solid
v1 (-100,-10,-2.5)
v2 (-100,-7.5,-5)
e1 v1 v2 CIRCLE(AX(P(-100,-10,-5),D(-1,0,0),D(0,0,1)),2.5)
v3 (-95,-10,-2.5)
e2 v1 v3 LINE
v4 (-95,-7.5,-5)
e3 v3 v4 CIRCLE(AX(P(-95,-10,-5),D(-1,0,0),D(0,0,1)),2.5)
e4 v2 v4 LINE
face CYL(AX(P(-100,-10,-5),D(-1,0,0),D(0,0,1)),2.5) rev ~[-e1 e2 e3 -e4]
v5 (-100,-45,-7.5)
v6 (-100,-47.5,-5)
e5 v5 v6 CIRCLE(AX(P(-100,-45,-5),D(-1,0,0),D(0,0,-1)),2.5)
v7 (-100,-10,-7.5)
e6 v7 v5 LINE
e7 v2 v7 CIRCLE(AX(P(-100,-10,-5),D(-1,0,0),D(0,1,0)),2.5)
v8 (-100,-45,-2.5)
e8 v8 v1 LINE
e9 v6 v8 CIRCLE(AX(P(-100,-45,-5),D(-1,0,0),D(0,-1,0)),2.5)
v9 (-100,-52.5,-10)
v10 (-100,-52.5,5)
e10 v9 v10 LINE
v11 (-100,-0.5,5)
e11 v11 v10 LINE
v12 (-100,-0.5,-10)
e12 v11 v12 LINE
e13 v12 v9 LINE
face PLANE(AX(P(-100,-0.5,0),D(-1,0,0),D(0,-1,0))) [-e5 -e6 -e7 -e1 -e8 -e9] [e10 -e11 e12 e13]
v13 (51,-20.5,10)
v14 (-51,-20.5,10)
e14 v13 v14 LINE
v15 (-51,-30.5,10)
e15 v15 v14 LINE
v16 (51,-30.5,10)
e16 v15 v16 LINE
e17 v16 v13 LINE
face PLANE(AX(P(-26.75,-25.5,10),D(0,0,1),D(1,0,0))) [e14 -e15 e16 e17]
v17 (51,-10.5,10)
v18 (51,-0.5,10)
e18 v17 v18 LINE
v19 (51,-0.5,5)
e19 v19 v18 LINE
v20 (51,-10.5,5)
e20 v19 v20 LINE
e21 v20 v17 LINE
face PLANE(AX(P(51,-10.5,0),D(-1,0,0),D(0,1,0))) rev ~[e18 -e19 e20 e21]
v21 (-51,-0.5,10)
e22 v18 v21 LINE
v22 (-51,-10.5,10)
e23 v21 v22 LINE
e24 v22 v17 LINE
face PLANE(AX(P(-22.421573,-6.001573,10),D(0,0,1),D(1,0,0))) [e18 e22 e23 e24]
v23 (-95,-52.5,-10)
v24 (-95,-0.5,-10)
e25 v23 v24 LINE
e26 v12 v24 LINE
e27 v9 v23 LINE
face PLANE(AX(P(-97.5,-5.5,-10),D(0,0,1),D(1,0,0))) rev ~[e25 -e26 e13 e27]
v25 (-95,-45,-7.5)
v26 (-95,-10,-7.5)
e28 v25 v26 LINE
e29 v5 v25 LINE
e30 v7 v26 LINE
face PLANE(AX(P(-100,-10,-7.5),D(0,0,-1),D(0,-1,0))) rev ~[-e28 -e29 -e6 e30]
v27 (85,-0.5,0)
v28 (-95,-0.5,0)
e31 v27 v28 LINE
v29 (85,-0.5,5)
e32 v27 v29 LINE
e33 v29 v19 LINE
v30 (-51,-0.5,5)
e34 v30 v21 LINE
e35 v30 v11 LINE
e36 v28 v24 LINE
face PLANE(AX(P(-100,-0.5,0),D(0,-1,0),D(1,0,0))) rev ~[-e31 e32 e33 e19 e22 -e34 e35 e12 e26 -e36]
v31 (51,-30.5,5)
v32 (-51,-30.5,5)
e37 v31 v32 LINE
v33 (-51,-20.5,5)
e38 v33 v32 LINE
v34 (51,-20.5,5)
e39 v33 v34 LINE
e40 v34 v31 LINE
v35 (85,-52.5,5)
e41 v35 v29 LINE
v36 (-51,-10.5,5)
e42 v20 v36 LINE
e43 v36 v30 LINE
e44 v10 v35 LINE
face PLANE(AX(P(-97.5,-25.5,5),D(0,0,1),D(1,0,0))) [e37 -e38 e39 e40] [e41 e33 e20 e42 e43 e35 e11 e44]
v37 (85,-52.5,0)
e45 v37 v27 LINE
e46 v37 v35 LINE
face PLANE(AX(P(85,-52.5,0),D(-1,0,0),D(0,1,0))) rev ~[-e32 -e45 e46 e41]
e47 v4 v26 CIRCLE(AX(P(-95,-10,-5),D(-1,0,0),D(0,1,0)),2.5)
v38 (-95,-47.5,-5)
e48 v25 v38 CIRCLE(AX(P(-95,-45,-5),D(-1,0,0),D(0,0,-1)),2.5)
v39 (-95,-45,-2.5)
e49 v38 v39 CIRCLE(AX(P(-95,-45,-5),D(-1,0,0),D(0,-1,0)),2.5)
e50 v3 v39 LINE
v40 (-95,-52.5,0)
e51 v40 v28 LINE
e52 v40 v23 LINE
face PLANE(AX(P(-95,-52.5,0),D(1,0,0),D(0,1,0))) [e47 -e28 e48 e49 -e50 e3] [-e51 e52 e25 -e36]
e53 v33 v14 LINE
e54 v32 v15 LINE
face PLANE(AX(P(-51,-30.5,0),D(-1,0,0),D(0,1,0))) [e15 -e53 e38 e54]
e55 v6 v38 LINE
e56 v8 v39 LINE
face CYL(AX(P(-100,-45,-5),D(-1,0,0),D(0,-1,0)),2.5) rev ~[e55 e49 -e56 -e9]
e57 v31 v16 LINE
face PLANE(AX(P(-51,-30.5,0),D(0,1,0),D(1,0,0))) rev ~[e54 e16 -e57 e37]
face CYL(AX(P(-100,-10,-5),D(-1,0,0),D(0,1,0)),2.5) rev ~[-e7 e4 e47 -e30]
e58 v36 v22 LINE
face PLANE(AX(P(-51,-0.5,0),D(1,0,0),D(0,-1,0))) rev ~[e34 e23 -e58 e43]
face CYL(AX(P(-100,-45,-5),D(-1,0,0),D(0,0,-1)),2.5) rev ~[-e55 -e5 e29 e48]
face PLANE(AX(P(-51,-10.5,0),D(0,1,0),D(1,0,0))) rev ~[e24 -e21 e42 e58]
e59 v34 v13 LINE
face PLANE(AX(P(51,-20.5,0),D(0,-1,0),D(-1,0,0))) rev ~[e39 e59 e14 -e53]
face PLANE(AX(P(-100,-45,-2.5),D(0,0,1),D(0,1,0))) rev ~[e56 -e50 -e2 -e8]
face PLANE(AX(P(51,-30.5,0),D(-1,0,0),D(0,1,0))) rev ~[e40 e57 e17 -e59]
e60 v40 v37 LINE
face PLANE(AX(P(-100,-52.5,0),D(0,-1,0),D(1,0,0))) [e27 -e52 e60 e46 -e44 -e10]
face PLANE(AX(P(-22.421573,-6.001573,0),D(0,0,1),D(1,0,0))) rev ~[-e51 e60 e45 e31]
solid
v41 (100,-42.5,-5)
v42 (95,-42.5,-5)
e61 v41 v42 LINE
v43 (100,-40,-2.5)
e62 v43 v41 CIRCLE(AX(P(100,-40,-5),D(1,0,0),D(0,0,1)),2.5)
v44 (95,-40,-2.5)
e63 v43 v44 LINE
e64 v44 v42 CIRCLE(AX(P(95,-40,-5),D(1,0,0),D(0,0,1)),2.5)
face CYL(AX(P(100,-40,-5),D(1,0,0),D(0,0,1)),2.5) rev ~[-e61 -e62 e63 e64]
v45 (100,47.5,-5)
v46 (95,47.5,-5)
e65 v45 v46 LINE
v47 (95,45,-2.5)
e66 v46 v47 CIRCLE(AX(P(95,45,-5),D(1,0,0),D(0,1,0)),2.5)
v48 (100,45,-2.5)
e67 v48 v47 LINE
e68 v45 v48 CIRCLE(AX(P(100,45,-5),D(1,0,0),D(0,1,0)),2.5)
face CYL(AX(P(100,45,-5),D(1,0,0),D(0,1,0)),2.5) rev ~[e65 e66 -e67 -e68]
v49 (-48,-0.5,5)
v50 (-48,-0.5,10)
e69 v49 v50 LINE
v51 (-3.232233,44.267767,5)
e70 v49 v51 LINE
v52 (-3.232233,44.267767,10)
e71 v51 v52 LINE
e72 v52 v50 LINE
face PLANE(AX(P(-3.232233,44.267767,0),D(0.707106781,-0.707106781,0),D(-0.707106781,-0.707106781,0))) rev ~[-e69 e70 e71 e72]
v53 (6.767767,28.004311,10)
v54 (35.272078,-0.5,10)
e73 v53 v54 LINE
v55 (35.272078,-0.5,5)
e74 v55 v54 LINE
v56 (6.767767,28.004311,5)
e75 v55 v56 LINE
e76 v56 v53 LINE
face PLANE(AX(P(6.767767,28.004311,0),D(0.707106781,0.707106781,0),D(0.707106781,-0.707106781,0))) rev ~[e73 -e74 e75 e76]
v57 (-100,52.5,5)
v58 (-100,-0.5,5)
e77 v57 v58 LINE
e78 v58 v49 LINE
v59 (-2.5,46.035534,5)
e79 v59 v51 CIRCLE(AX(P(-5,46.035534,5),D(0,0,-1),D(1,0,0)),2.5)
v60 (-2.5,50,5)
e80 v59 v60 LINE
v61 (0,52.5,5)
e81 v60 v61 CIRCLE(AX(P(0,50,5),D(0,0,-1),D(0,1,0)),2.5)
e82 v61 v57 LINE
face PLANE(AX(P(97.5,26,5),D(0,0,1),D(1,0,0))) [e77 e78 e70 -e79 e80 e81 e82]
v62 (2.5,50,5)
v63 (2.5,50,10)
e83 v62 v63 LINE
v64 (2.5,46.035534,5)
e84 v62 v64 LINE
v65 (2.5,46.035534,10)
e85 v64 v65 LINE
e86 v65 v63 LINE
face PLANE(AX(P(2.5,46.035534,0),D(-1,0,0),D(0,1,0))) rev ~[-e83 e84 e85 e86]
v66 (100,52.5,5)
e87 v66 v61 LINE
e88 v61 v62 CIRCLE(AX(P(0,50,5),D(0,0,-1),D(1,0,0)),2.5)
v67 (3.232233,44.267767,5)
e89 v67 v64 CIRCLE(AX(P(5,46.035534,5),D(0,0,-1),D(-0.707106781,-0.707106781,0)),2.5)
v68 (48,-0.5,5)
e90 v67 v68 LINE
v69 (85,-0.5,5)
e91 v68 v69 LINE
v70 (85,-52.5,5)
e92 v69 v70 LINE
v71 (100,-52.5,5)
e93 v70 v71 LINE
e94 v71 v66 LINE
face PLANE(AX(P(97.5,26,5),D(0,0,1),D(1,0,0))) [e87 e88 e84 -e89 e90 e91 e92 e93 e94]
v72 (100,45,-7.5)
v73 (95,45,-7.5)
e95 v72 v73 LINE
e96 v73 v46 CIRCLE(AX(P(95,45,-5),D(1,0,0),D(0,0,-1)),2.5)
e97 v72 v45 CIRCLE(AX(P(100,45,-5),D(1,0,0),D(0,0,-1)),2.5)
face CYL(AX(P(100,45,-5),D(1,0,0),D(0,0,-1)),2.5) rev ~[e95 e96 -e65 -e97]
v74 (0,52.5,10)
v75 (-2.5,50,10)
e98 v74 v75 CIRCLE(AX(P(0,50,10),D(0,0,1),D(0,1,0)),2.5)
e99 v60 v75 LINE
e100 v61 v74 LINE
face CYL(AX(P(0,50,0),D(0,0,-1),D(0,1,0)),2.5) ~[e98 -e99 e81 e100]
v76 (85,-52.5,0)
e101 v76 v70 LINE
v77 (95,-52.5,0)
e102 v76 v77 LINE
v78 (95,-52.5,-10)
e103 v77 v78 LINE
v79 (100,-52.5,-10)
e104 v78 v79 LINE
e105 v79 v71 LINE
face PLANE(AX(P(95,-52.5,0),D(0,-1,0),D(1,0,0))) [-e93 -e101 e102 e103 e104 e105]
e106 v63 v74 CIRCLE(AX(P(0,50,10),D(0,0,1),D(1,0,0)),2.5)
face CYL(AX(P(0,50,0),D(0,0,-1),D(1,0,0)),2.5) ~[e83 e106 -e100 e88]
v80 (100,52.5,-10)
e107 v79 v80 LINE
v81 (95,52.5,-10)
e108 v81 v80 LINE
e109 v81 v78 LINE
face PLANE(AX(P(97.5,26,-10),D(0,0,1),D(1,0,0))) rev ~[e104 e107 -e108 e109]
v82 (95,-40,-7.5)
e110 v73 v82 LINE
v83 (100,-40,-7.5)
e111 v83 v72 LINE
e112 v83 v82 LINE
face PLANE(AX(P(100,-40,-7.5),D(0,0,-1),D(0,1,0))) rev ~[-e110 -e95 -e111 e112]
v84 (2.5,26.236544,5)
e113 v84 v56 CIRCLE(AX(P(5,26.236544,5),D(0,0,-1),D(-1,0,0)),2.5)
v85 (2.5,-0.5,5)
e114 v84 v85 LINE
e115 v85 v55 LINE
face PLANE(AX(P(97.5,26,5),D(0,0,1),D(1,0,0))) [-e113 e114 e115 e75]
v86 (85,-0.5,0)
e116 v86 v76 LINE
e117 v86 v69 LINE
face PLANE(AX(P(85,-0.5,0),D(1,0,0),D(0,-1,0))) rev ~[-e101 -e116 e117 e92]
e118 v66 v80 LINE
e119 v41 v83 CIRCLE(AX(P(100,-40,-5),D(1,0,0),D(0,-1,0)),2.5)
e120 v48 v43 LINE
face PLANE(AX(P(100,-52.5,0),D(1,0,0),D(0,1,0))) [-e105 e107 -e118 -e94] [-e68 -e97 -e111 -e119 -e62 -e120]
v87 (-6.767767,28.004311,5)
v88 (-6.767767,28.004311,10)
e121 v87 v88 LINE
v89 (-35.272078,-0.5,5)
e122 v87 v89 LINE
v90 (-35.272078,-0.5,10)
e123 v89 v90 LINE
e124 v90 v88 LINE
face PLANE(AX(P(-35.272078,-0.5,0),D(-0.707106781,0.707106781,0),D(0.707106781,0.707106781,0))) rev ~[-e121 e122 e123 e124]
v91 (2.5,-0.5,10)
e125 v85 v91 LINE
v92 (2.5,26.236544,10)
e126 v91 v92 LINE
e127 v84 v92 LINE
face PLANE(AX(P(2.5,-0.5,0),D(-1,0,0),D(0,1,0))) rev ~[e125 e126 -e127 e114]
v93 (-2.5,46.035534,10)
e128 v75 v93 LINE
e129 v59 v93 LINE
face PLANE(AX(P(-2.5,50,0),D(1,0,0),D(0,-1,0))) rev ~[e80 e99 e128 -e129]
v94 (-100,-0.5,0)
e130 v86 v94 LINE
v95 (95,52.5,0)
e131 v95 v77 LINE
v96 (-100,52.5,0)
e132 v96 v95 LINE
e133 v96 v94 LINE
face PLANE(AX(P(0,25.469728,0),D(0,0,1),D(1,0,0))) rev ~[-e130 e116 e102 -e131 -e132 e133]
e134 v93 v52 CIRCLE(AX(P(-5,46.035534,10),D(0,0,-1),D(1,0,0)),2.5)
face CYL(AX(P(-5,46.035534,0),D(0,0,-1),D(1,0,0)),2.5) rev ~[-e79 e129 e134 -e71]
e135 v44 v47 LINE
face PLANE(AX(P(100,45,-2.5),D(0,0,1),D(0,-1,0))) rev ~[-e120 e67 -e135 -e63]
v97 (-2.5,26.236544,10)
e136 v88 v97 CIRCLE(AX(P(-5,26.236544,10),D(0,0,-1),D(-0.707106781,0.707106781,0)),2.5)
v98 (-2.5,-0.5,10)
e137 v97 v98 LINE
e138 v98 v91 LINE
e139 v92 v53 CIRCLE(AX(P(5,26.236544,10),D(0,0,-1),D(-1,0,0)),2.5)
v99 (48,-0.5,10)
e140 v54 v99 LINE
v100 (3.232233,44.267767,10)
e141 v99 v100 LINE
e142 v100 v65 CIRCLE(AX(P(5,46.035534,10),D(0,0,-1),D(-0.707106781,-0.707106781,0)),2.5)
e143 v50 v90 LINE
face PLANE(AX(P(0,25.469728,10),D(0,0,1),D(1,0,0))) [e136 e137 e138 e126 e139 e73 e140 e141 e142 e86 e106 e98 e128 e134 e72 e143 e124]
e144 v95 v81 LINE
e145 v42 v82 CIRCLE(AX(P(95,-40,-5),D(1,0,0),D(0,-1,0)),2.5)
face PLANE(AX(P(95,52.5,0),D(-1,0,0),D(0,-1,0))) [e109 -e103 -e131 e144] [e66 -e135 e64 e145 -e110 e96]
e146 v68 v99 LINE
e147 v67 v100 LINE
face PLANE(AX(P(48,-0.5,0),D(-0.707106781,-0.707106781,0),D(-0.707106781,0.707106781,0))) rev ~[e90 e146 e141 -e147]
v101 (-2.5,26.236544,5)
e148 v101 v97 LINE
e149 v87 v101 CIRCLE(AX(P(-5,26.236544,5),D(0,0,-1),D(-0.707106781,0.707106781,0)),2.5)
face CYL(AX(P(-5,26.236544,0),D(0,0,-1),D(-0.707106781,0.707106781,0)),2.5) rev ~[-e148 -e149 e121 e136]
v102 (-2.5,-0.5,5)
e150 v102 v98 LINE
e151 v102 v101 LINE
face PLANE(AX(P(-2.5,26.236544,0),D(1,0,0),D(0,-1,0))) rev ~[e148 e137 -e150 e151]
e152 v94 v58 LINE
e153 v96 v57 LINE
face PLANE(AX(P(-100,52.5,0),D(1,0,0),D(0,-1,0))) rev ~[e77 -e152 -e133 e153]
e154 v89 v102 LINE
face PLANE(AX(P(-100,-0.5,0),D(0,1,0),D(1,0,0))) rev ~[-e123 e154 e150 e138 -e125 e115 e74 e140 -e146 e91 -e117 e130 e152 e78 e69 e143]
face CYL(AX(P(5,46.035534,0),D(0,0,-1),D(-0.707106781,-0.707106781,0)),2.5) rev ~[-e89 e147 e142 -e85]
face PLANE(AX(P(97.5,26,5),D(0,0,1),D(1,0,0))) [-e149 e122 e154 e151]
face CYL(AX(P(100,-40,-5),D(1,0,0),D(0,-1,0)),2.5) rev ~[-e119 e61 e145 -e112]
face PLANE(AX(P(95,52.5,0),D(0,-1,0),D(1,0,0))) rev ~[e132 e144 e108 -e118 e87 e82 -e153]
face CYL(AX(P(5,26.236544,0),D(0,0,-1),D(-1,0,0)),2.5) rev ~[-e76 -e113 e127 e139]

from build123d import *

# Parameters (mm, degrees)
F0_W      = 5
F0_H      = 53
F0_W_2    = 10
F0_H_2    = 10
F1_DEPTH  = 5
F2_DEPTH  = 10
F3_DEPTH  = 10
F0_W_3    = 48.5
F4_DEPTH  = 5
F5_DEPTH  = 10
F6_DEPTH  = 10
F8_DEPTH  = 25
F10_DEPTH = 25


with BuildPart() as f1:
    # F0 (on Top) → F1 (new body)
    with BuildSketch(Plane.XY):
        with Locations((97.5, 26)):
            Rectangle(F0_W, F0_H)
        with BuildLine():
            Line((0, 52.5), (-100, 52.5))
            Line((-100, 52.5), (-100, -0.5))
            Line((-100, -0.5), (-95, -0.5))
            Line((-95, -0.5), (-51, -0.5))
            Line((-51, -0.5), (-48, -0.5))
            Line((-48, -0.5), (-3.232233047, 44.267766953))
            ThreePointArc((-3.232233047, 44.267766953), (-2.6903011687, 45.078825325), (-2.5, 46.0355339059))
            Line((-2.5, 46.0355339059), (-2.5, 50))
            ThreePointArc((-2.5, 50), (-1.767766953, 51.767766953), (0, 52.5))
        make_face()
        with BuildLine():
            Line((85, 52.5), (0, 52.5))
            ThreePointArc((0, 52.5), (1.767766953, 51.767766953), (2.5, 50))
            Line((2.5, 50), (2.5, 46.0355339059))
            ThreePointArc((2.5, 46.0355339059), (2.6903011687, 45.078825325), (3.232233047, 44.267766953))
            Line((3.232233047, 44.267766953), (48, -0.5))
            Line((48, -0.5), (51, -0.5))
            Line((51, -0.5), (85, -0.5))
            Line((85, -0.5), (85, 52.5))
        make_face()
        with BuildLine():
            ThreePointArc((2.5, 50), (1.767766953, 51.767766953), (0, 52.5))
            ThreePointArc((0, 52.5), (-1.767766953, 51.767766953), (-2.5, 50))
            Line((-2.5, 50), (-2.5, 46.0355339059))
            Line((-2.5, 46.0355339059), (-2.5, 32.2720779386))
            Line((-2.5, 32.2720779386), (-2.5, 26.2365440327))
            Line((-2.5, 26.2365440327), (-2.5, 0))
            Line((-2.5, 0), (-2.5, -0.5))
            Line((-2.5, -0.5), (2.5, -0.5))
            Line((2.5, -0.5), (2.5, 26.2365440327))
            Line((2.5, 26.2365440327), (2.5, 46.0355339059))
            Line((2.5, 46.0355339059), (2.5, 50))
        make_face()
        with BuildLine():
            Line((-2.5, 32.2720779386), (-2.5, 46.0355339059))
            ThreePointArc((-2.5, 46.0355339059), (-2.6903011687, 45.078825325), (-3.232233047, 44.267766953))
            Line((-3.232233047, 44.267766953), (-48, -0.5))
            Line((-48, -0.5), (-35.2720779386, -0.5))
            Line((-35.2720779386, -0.5), (-6.767766953, 28.0043109857))
            ThreePointArc((-6.767766953, 28.0043109857), (-4.0432914191, 28.546242864), (-2.5, 26.2365440327))
            Line((-2.5, 26.2365440327), (-2.5, 32.2720779386))
        make_face()
        with BuildLine():
            Line((-2.5, 0), (-2.5, 26.2365440327))
            ThreePointArc((-2.5, 26.2365440327), (-4.0432914191, 28.546242864), (-6.767766953, 28.0043109857))
            Line((-6.767766953, 28.0043109857), (-35.2720779386, -0.5))
            Line((-35.2720779386, -0.5), (-2.5, -0.5))
            Line((-2.5, -0.5), (-2.5, 0))
        make_face()
        with BuildLine():
            ThreePointArc((6.767766953, 28.0043109857), (4.0432914191, 28.546242864), (2.5, 26.2365440327))
            Line((2.5, 26.2365440327), (2.5, -0.5))
            Line((2.5, -0.5), (35.2720779386, -0.5))
            Line((35.2720779386, -0.5), (6.767766953, 28.0043109857))
        make_face()
        with BuildLine():
            ThreePointArc((3.232233047, 44.267766953), (2.6903011687, 45.078825325), (2.5, 46.0355339059))
            Line((2.5, 46.0355339059), (2.5, 26.2365440327))
            ThreePointArc((2.5, 26.2365440327), (4.0432914191, 28.546242864), (6.767766953, 28.0043109857))
            Line((6.767766953, 28.0043109857), (35.2720779386, -0.5))
            Line((35.2720779386, -0.5), (48, -0.5))
            Line((48, -0.5), (3.232233047, 44.267766953))
        make_face()
        with Locations((90, 26)):
            Rectangle(F0_W_2, F0_H)
        with Locations((90, -5.5)):
            Rectangle(F0_W_2, F0_H_2)
        with Locations((90, -15.5)):
            Rectangle(F0_W_2, F0_H_2)
        with Locations((90, -25.5)):
            Rectangle(F0_W_2, F0_H_2)
        with Locations((97.5, -25.5)):
            Rectangle(F0_W, F0_H_2)
        with Locations((97.5, -15.5)):
            Rectangle(F0_W, F0_H_2)
        with Locations((97.5, -5.5)):
            Rectangle(F0_W, F0_H_2)
        Polygon((95, -30.5), (85, -30.5), (85, -37.5), (95, -47.5), align=None)
        with BuildLine():
            Line((100, -30.5), (95, -30.5))
            Line((95, -30.5), (95, -47.5))
            Line((95, -47.5), (95.732233047, -48.232233047))
            ThreePointArc((95.732233047, -48.232233047), (96.4244505146, -50.4455071839), (95, -52.2754493028))
            Line((95, -52.2754493028), (95, -52.5))
            Line((95, -52.5), (100, -52.5))
            Line((100, -52.5), (100, -30.5))
        make_face()
        with BuildLine():
            Line((95, -47.5), (85, -37.5))
            Line((85, -37.5), (85, -50.2279220614))
            Line((85, -50.2279220614), (86.5398448916, -51.767766953))
            ThreePointArc((86.5398448916, -51.767766953), (87.3509032637, -52.3096988313), (88.3076118446, -52.5))
            Line((88.3076118446, -52.5), (93.9644660941, -52.5))
            ThreePointArc((93.9644660941, -52.5), (94.4942664069, -52.4432174747), (95, -52.2754493028))
            Line((95, -52.2754493028), (95, -47.5))
        make_face()
        with BuildLine():
            Line((86.5398448916, -51.767766953), (85, -50.2279220614))
            Line((85, -50.2279220614), (85, -52.5))
            Line((85, -52.5), (88.3076118446, -52.5))
            ThreePointArc((88.3076118446, -52.5), (87.3509032637, -52.3096988313), (86.5398448916, -51.767766953))
        make_face()
        with BuildLine():
            Line((95.732233047, -48.232233047), (95, -47.5))
            Line((95, -47.5), (95, -52.2754493028))
            ThreePointArc((95, -52.2754493028), (96.4244505146, -50.4455071839), (95.732233047, -48.232233047))
        make_face()
        with BuildLine():
            Line((95, -52.5), (95, -52.2754493028))
            ThreePointArc((95, -52.2754493028), (94.4942664069, -52.4432174747), (93.9644660941, -52.5))
            Line((93.9644660941, -52.5), (95, -52.5))
        make_face()
    extrude(amount=F1_DEPTH)

    # F0 (on Top) → F2 (join)
    with BuildSketch(Plane.XY):
        with BuildLine():
            ThreePointArc((2.5, 50), (1.767766953, 51.767766953), (0, 52.5))
            ThreePointArc((0, 52.5), (-1.767766953, 51.767766953), (-2.5, 50))
            Line((-2.5, 50), (-2.5, 46.0355339059))
            Line((-2.5, 46.0355339059), (-2.5, 32.2720779386))
            Line((-2.5, 32.2720779386), (-2.5, 26.2365440327))
            Line((-2.5, 26.2365440327), (-2.5, 0))
            Line((-2.5, 0), (-2.5, -0.5))
            Line((-2.5, -0.5), (2.5, -0.5))
            Line((2.5, -0.5), (2.5, 26.2365440327))
            Line((2.5, 26.2365440327), (2.5, 46.0355339059))
            Line((2.5, 46.0355339059), (2.5, 50))
        make_face()
        with BuildLine():
            Line((-2.5, 32.2720779386), (-2.5, 46.0355339059))
            ThreePointArc((-2.5, 46.0355339059), (-2.6903011687, 45.078825325), (-3.232233047, 44.267766953))
            Line((-3.232233047, 44.267766953), (-48, -0.5))
            Line((-48, -0.5), (-35.2720779386, -0.5))
            Line((-35.2720779386, -0.5), (-6.767766953, 28.0043109857))
            ThreePointArc((-6.767766953, 28.0043109857), (-4.0432914191, 28.546242864), (-2.5, 26.2365440327))
            Line((-2.5, 26.2365440327), (-2.5, 32.2720779386))
        make_face()
        with BuildLine():
            ThreePointArc((3.232233047, 44.267766953), (2.6903011687, 45.078825325), (2.5, 46.0355339059))
            Line((2.5, 46.0355339059), (2.5, 26.2365440327))
            ThreePointArc((2.5, 26.2365440327), (4.0432914191, 28.546242864), (6.767766953, 28.0043109857))
            Line((6.767766953, 28.0043109857), (35.2720779386, -0.5))
            Line((35.2720779386, -0.5), (48, -0.5))
            Line((48, -0.5), (3.232233047, 44.267766953))
        make_face()
    extrude(amount=F2_DEPTH)

    # F0 (on Top) → F3 (join)
    with BuildSketch(Plane.XY):
        with Locations((97.5, 26)):
            Rectangle(F0_W, F0_H)
        with Locations((97.5, -5.5)):
            Rectangle(F0_W, F0_H_2)
        with Locations((97.5, -15.5)):
            Rectangle(F0_W, F0_H_2)
        with Locations((97.5, -25.5)):
            Rectangle(F0_W, F0_H_2)
        with BuildLine():
            Line((100, -30.5), (95, -30.5))
            Line((95, -30.5), (95, -47.5))
            Line((95, -47.5), (95.732233047, -48.232233047))
            ThreePointArc((95.732233047, -48.232233047), (96.4244505146, -50.4455071839), (95, -52.2754493028))
            Line((95, -52.2754493028), (95, -52.5))
            Line((95, -52.5), (100, -52.5))
            Line((100, -52.5), (100, -30.5))
        make_face()
        with BuildLine():
            Line((95.732233047, -48.232233047), (95, -47.5))
            Line((95, -47.5), (95, -52.2754493028))
            ThreePointArc((95, -52.2754493028), (96.4244505146, -50.4455071839), (95.732233047, -48.232233047))
        make_face()
    extrude(amount=-F3_DEPTH)

    # F7 (on face) → F8 (cut)
    with BuildSketch(Plane.YZ.offset(100)):
        with BuildLine():
            Line((45, -2.5), (-40, -2.5))
            ThreePointArc((-40, -2.5), (-41.767766953, -3.232233047), (-42.5, -5))
            ThreePointArc((-42.5, -5), (-41.767766953, -6.767766953), (-40, -7.5))
            Line((-40, -7.5), (45, -7.5))
            ThreePointArc((45, -7.5), (46.767766953, -6.767766953), (47.5, -5))
            ThreePointArc((47.5, -5), (46.767766953, -3.232233047), (45, -2.5))
        make_face()
    extrude(amount=-F8_DEPTH, mode=Mode.SUBTRACT)


with BuildPart() as f4:
    # F0 (on Top) → F4 (new body)
    with BuildSketch(Plane.XY):
        with Locations((-97.5, -25.5)):
            Rectangle(F0_W, F0_H_2)
        Polygon((-68, -20.5), (-95, -20.5), (-95, -30.5), (-78, -30.5), align=None)
        with Locations((-97.5, -15.5)):
            Rectangle(F0_W, F0_H_2)
        with Locations((-97.5, -5.5)):
            Rectangle(F0_W, F0_H_2)
        Polygon((-51, -0.5), (-95, -0.5), (-95, -10.5), (-58, -10.5), (-51, -3.5), align=None)
        Polygon((-58, -10.5), (-95, -10.5), (-95, -20.5), (-68, -20.5), align=None)
        Polygon((-55.2720779386, -20.5), (-68, -20.5), (-78, -30.5), (-65.2720779386, -30.5), align=None)
        Polygon((-51, -10.5), (-58, -10.5), (-68, -20.5), (-55.2720779386, -20.5), (-45.2720779386, -10.5), align=None)
        Polygon((-35.2720779386, -0.5), (-48, -0.5), (-51, -3.5), (-51, -10.5), (-45.2720779386, -10.5), align=None)
        Polygon((-51, -3.5), (-58, -10.5), (-51, -10.5), align=None)
        Polygon((-48, -0.5), (-51, -0.5), (-51, -3.5), align=None)
        Polygon((-2.5, -0.5), (-35.2720779386, -0.5), (-45.2720779386, -10.5), (-2.5, -10.5), align=None)
        Polygon((-45.2720779386, -10.5), (-55.2720779386, -20.5), (-51, -20.5), (-2.5, -20.5), (-2.5, -10.5), align=None)
        Polygon((-51, -20.5), (-55.2720779386, -20.5), (-65.2720779386, -30.5), (-51, -30.5), align=None)
        with Locations((-26.75, -25.5)):
            Rectangle(F0_W_3, F0_H_2)
        with Locations((0, -5.5)):
            Rectangle(F0_W, F0_H_2)
        with Locations((0, -15.5)):
            Rectangle(F0_W, F0_H_2)
        with Locations((0, -25.5)):
            Rectangle(F0_W, F0_H_2)
        Polygon((45.2720779386, -10.5), (2.5, -10.5), (2.5, -20.5), (51, -20.5), (55.2720779386, -20.5), align=None)
        Polygon((35.2720779386, -0.5), (2.5, -0.5), (2.5, -10.5), (45.2720779386, -10.5), align=None)
        Polygon((65.2720779386, -30.5), (55.2720779386, -20.5), (51, -20.5), (51, -30.5), align=None)
        Polygon((78, -30.5), (68, -20.5), (55.2720779386, -20.5), (65.2720779386, -30.5), align=None)
        Polygon((68, -20.5), (58, -10.5), (51, -10.5), (45.2720779386, -10.5), (55.2720779386, -20.5), align=None)
        with Locations((26.75, -25.5)):
            Rectangle(F0_W_3, F0_H_2)
        Polygon((51, -3.5), (48, -0.5), (35.2720779386, -0.5), (45.2720779386, -10.5), (51, -10.5), align=None)
        Polygon((51, -3.5), (51, -0.5), (48, -0.5), align=None)
        Polygon((58, -10.5), (51, -3.5), (51, -10.5), align=None)
        Polygon((85, -30.5), (85, -20.5), (68, -20.5), (78, -30.5), align=None)
        Polygon((85, -20.5), (85, -10.5), (58, -10.5), (68, -20.5), align=None)
        Polygon((85, -10.5), (85, -0.5), (51, -0.5), (51, -3.5), (58, -10.5), align=None)
        Polygon((85, -37.5), (85, -30.5), (78, -30.5), align=None)
        Polygon((85, -37.5), (78, -30.5), (65.2720779386, -30.5), (85, -50.2279220614), align=None)
        with BuildLine():
            Line((85, -50.2279220614), (65.2720779386, -30.5))
            Line((65.2720779386, -30.5), (51, -30.5))
            Line((51, -30.5), (2.5, -30.5))
            Line((2.5, -30.5), (2.5, -50))
            ThreePointArc((2.5, -50), (1.767766953, -51.767766953), (0, -52.5))
            Line((0, -52.5), (85, -52.5))
            Line((85, -52.5), (85, -50.2279220614))
        make_face()
        with BuildLine():
            Line((2.5, -50), (2.5, -30.5))
            Line((2.5, -30.5), (-2.5, -30.5))
            Line((-2.5, -30.5), (-2.5, -50))
            ThreePointArc((-2.5, -50), (-1.767766953, -51.767766953), (0, -52.5))
            ThreePointArc((0, -52.5), (1.767766953, -51.767766953), (2.5, -50))
        make_face()
        with BuildLine():
            Line((-51, -30.5), (-65.2720779386, -30.5))
            Line((-65.2720779386, -30.5), (-86.5398448916, -51.767766953))
            ThreePointArc((-86.5398448916, -51.767766953), (-87.3509032637, -52.3096988313), (-88.3076118446, -52.5))
            Line((-88.3076118446, -52.5), (0, -52.5))
            ThreePointArc((0, -52.5), (-1.767766953, -51.767766953), (-2.5, -50))
            Line((-2.5, -50), (-2.5, -30.5))
            Line((-2.5, -30.5), (-51, -30.5))
        make_face()
        with BuildLine():
            Line((-65.2720779386, -30.5), (-78, -30.5))
            Line((-78, -30.5), (-95, -47.5))
            Line((-95, -47.5), (-95, -52.2754493028))
            ThreePointArc((-95, -52.2754493028), (-94.4942664069, -52.4432174747), (-93.9644660941, -52.5))
            Line((-93.9644660941, -52.5), (-88.3076118446, -52.5))
            ThreePointArc((-88.3076118446, -52.5), (-87.3509032637, -52.3096988313), (-86.5398448916, -51.767766953))
            Line((-86.5398448916, -51.767766953), (-65.2720779386, -30.5))
        make_face()
        with BuildLine():
            Line((-95, -30.5), (-100, -30.5))
            Line((-100, -30.5), (-100, -52.5))
            Line((-100, -52.5), (-95, -52.5))
            Line((-95, -52.5), (-95, -52.2754493028))
            ThreePointArc((-95, -52.2754493028), (-96.4244505146, -50.4455071839), (-95.732233047, -48.232233047))
            Line((-95.732233047, -48.232233047), (-95, -47.5))
            Line((-95, -47.5), (-95, -30.5))
        make_face()
        with BuildLine():
            Line((-95, -52.2754493028), (-95, -52.5))
            Line((-95, -52.5), (-93.9644660941, -52.5))
            ThreePointArc((-93.9644660941, -52.5), (-94.4942664069, -52.4432174747), (-95, -52.2754493028))
        make_face()
        Polygon((-78, -30.5), (-95, -30.5), (-95, -47.5), align=None)
        with BuildLine():
            Line((-95, -52.2754493028), (-95, -47.5))
            Line((-95, -47.5), (-95.732233047, -48.232233047))
            ThreePointArc((-95.732233047, -48.232233047), (-96.4244505146, -50.4455071839), (-95, -52.2754493028))
        make_face()
    extrude(amount=F4_DEPTH)

    # F0 (on Top) → F5 (join)
    with BuildSketch(Plane.XY):
        with Locations((-97.5, -5.5)):
            Rectangle(F0_W, F0_H_2)
        with Locations((-97.5, -15.5)):
            Rectangle(F0_W, F0_H_2)
        with Locations((-97.5, -25.5)):
            Rectangle(F0_W, F0_H_2)
        with BuildLine():
            Line((-95, -30.5), (-100, -30.5))
            Line((-100, -30.5), (-100, -52.5))
            Line((-100, -52.5), (-95, -52.5))
            Line((-95, -52.5), (-95, -52.2754493028))
            ThreePointArc((-95, -52.2754493028), (-96.4244505146, -50.4455071839), (-95.732233047, -48.232233047))
            Line((-95.732233047, -48.232233047), (-95, -47.5))
            Line((-95, -47.5), (-95, -30.5))
        make_face()
        with BuildLine():
            Line((-95, -52.2754493028), (-95, -47.5))
            Line((-95, -47.5), (-95.732233047, -48.232233047))
            ThreePointArc((-95.732233047, -48.232233047), (-96.4244505146, -50.4455071839), (-95, -52.2754493028))
        make_face()
    extrude(amount=-F5_DEPTH)

    # F0 (on Top) → F6 (join)
    with BuildSketch(Plane.XY):
        Polygon((-2.5, -0.5), (-35.2720779386, -0.5), (-45.2720779386, -10.5), (-2.5, -10.5), align=None)
        Polygon((-35.2720779386, -0.5), (-48, -0.5), (-51, -3.5), (-51, -10.5), (-45.2720779386, -10.5), align=None)
        Polygon((-48, -0.5), (-51, -0.5), (-51, -3.5), align=None)
        with Locations((-26.75, -25.5)):
            Rectangle(F0_W_3, F0_H_2)
        with Locations((26.75, -25.5)):
            Rectangle(F0_W_3, F0_H_2)
        with Locations((0, -25.5)):
            Rectangle(F0_W, F0_H_2)
        Polygon((35.2720779386, -0.5), (2.5, -0.5), (2.5, -10.5), (45.2720779386, -10.5), align=None)
        with Locations((0, -5.5)):
            Rectangle(F0_W, F0_H_2)
        Polygon((51, -3.5), (48, -0.5), (35.2720779386, -0.5), (45.2720779386, -10.5), (51, -10.5), align=None)
        Polygon((51, -3.5), (51, -0.5), (48, -0.5), align=None)
    extrude(amount=F6_DEPTH)

    # F9 (on face) → F10 (cut)
    with BuildSketch(Plane(origin=(-100, 0, 0), x_dir=(0, -1, 0), z_dir=(-1, 0, 0))):
        with BuildLine():
            Line((45, -2.5), (10, -2.5))
            ThreePointArc((10, -2.5), (8.232233047, -3.232233047), (7.5, -5))
            ThreePointArc((7.5, -5), (8.232233047, -6.767766953), (10, -7.5))
            Line((10, -7.5), (45, -7.5))
            ThreePointArc((45, -7.5), (46.767766953, -6.767766953), (47.5, -5))
            ThreePointArc((47.5, -5), (46.767766953, -3.232233047), (45, -2.5))
        make_face()
    extrude(amount=-F10_DEPTH, mode=Mode.SUBTRACT)


solid = Compound([f1.part, f4.part])
